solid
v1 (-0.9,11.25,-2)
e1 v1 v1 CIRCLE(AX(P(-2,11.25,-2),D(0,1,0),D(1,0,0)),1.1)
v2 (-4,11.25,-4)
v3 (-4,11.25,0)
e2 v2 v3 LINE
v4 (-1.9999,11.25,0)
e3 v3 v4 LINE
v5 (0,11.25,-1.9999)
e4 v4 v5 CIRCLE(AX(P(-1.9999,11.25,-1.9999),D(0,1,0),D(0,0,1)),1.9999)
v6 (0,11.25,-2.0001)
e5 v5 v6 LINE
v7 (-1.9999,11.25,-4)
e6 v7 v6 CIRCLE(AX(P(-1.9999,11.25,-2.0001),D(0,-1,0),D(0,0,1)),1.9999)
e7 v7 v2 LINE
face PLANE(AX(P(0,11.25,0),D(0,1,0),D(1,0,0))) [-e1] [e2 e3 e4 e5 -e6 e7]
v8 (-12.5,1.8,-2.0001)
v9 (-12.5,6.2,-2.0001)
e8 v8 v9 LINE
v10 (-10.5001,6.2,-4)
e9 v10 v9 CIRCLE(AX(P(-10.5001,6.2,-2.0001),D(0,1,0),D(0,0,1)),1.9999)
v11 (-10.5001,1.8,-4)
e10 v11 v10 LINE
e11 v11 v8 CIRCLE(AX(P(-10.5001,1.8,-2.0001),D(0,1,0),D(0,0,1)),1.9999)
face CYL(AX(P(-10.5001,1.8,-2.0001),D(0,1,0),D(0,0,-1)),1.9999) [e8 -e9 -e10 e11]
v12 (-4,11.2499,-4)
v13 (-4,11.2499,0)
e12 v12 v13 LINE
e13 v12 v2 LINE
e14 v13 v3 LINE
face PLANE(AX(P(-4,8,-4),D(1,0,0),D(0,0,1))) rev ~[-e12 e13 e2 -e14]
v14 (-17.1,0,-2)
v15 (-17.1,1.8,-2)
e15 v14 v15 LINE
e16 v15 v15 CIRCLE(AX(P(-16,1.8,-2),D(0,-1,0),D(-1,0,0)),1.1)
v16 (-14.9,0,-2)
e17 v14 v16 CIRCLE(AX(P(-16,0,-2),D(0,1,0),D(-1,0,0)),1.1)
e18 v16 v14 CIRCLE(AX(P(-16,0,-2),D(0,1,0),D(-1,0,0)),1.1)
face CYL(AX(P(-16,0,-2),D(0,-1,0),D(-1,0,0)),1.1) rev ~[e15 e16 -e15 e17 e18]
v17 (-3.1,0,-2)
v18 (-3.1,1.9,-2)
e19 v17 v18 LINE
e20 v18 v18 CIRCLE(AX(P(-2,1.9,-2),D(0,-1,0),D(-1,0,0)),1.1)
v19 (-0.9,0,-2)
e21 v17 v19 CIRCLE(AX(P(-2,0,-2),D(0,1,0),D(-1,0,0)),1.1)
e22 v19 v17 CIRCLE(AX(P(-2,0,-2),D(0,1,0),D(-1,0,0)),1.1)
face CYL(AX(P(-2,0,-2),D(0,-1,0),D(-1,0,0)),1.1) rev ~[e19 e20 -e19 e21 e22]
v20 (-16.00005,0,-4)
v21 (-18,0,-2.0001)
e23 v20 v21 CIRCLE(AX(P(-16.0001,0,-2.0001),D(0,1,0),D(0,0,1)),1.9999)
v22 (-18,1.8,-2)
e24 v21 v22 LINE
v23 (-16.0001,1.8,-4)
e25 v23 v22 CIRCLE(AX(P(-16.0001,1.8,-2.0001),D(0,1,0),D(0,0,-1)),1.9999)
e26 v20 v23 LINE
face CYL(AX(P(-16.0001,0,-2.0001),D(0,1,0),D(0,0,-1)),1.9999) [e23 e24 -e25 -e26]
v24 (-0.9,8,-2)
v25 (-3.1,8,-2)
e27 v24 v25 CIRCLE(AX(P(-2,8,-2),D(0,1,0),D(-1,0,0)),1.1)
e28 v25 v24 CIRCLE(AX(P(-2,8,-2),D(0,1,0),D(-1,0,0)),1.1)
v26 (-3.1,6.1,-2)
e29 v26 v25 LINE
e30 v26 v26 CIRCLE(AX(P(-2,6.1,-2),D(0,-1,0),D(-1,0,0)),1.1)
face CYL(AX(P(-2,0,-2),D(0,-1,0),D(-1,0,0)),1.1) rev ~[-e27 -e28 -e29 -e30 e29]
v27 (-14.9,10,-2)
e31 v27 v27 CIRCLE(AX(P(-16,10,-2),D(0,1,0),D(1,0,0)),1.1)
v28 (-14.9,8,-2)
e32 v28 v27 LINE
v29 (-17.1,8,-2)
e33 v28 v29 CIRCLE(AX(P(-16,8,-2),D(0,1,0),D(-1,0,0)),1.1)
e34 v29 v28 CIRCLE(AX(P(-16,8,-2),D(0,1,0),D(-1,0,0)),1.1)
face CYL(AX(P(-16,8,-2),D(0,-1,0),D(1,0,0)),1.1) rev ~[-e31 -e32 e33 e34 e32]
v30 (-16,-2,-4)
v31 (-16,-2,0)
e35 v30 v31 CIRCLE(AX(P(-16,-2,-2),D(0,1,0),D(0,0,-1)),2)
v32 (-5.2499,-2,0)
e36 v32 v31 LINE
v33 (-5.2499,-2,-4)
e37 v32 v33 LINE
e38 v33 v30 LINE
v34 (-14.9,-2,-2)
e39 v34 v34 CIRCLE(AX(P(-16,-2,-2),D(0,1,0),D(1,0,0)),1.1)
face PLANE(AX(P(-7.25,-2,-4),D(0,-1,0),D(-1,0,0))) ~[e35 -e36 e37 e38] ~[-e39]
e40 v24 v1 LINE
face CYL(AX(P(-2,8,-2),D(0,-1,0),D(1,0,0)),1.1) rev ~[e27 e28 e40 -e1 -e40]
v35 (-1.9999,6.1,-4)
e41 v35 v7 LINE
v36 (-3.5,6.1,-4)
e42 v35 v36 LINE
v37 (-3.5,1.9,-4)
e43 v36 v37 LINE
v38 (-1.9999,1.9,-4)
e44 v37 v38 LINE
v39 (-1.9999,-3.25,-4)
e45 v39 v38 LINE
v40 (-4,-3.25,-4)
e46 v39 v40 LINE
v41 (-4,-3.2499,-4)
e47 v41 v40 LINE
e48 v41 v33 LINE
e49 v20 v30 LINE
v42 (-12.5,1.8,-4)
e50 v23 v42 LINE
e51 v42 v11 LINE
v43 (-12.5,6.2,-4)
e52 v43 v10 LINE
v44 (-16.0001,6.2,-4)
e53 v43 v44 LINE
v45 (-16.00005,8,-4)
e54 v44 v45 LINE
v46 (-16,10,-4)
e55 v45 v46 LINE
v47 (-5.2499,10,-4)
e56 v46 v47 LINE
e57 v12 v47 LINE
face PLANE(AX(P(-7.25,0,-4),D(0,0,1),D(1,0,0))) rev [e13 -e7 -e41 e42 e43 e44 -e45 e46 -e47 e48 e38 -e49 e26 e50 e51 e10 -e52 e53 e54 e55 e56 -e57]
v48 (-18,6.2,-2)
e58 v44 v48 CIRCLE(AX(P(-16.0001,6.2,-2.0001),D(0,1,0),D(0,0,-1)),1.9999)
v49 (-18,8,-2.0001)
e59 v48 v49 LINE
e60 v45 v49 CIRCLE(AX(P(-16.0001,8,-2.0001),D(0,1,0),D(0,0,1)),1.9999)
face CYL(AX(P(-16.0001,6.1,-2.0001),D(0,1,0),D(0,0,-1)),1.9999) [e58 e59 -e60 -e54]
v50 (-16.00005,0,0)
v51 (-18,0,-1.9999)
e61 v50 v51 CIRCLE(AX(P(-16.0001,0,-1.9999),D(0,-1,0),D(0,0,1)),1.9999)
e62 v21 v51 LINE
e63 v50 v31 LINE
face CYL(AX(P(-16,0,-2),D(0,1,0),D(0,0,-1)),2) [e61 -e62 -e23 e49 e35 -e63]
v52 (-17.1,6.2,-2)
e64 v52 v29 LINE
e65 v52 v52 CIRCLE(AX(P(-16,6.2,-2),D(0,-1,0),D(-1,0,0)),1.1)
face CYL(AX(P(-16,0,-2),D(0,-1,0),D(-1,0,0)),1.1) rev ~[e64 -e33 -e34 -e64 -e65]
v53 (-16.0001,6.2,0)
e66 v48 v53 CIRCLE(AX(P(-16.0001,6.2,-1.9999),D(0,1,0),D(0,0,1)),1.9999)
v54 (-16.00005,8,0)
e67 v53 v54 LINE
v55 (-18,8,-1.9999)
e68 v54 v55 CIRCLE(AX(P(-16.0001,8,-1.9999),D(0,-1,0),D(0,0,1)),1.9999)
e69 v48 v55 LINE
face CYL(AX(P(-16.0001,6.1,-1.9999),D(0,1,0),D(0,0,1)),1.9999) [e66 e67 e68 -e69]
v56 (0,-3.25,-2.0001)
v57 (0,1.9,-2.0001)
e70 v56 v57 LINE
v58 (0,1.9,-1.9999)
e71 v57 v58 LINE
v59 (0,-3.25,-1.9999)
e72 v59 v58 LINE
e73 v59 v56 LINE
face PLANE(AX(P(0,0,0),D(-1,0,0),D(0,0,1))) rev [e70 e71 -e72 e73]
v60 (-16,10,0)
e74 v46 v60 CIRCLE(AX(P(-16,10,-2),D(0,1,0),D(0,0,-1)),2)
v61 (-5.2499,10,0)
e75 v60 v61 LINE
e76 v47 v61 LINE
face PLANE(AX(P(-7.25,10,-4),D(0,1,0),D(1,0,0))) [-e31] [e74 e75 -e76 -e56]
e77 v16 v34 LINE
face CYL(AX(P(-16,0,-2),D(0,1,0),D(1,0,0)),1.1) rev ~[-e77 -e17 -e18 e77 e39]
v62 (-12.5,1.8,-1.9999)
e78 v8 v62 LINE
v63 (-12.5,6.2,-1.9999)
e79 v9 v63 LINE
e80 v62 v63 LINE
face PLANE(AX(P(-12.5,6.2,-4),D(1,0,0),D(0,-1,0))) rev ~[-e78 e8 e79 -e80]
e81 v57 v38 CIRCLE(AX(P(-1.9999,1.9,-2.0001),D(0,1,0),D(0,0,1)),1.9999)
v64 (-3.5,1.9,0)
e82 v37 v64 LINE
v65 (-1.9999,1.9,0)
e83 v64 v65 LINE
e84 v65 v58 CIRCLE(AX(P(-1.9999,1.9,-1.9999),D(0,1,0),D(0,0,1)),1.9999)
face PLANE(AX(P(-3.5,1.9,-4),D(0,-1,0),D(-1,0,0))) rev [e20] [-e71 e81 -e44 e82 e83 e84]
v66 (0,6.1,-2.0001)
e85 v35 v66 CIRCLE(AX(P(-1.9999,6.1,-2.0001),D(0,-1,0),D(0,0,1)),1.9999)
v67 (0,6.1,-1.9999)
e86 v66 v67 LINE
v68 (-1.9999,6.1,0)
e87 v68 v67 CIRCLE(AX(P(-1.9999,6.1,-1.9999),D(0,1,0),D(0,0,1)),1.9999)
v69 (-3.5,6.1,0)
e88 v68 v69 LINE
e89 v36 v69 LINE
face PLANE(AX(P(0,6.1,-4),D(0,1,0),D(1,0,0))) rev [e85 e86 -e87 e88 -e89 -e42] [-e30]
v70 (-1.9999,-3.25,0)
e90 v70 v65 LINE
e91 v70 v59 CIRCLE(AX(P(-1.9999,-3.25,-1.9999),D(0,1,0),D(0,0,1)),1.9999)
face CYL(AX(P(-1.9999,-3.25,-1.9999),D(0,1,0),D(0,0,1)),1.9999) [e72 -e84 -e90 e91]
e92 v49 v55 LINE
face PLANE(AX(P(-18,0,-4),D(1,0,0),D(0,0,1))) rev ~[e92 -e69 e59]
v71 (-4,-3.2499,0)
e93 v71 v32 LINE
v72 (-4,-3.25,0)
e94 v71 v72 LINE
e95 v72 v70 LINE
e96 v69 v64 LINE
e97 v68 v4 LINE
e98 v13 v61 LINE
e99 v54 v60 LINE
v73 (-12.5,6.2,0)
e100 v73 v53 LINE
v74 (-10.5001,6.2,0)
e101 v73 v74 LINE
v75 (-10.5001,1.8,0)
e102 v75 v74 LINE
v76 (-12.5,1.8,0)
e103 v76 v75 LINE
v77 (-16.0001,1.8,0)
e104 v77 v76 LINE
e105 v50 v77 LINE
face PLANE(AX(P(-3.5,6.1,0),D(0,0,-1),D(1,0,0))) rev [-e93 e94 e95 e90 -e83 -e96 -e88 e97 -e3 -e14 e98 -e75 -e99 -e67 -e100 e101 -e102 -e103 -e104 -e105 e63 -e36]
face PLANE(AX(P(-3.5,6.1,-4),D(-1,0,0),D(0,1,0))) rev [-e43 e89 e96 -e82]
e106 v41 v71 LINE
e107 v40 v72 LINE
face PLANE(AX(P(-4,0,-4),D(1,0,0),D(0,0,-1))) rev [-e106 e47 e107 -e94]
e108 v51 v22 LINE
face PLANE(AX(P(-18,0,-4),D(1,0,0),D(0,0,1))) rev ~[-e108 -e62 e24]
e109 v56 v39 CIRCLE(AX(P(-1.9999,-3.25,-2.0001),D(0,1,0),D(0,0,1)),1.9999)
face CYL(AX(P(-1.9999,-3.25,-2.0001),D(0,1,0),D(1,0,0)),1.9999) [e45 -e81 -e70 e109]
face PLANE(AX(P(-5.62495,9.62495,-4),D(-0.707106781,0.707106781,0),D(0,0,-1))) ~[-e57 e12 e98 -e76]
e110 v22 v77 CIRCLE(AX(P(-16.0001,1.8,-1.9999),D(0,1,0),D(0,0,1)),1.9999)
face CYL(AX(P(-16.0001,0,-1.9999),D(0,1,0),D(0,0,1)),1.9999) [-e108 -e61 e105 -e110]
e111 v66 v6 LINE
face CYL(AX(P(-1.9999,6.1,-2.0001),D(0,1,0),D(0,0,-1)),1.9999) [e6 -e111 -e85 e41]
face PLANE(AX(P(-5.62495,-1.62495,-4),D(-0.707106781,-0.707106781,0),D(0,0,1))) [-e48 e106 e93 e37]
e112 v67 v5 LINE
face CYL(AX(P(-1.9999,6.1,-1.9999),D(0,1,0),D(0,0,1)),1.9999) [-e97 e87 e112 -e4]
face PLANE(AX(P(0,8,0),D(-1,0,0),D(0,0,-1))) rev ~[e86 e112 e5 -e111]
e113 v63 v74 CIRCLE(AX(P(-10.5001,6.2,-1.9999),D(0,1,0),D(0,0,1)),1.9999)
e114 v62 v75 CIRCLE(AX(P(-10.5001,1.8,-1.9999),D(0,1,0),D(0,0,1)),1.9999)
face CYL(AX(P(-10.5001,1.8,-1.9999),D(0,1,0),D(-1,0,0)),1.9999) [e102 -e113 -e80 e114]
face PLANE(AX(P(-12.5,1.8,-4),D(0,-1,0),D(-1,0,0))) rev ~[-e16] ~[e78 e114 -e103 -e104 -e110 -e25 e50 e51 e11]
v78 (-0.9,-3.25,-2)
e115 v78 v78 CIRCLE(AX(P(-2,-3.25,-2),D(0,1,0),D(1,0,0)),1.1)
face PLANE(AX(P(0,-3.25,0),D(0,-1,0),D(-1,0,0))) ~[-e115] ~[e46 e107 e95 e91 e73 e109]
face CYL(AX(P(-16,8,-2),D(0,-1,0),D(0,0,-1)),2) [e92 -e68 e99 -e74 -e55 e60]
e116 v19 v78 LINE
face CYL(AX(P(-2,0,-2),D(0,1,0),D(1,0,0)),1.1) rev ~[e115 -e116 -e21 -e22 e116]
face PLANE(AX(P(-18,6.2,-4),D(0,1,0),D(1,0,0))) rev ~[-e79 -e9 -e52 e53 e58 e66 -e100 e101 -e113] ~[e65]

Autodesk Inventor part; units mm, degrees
sketch "Sketch1" plane through (0, 0, 0) normal (0, 1, 0) x (-1, 0, 0)
  line L0 (0, 0) -> (18, 0)
  line L1 (18, 0) -> (18, -4)
  line L2 (18, -4) -> (0, -4)
  line L3 (0, -4) -> (0, 0)
  line L4 (18, -2) -> (16, -2)
  line L5 (9, -4) -> (9, -3)
  circle A0 centre (16, -2) radius 1.1
  circle A1 centre (2, -2) radius 1.1
  dimension "d0" = 18
  dimension "d1" = 4
  dimension "d2" = 2
  dimension "d3" = 2.2
sketch "Sketch1 outline for Extrusion1" plane through (0, 0, 0) normal (0, 1, 0) x (-1, 0, 0)
  line L0 (18, -4) -> (18, 0)
  line L1 (0, -4) -> (18, -4)
  line L2 (0, 0) -> (0, -4)
  line L3 (18, 0) -> (0, 0)
extrude "Extrusion1" add sketch "Sketch1 outline for Extrusion1" along normal blind 8
sketch "Sketch2" plane through (0, 0, -4) normal (0, 0, -1) x (-1, 0, 0)
  line L0 (18, 0) -> (18, 8) projected
  line L1 (18, 8) -> (18, 6.1)
  line L2 (18, 0) -> (0, 0) projected
  line L3 (18, 0) -> (18, 1.9)
  line L4 (18, 6.1) -> (14.5, 6.1)
  line L5 (14.5, 6.1) -> (14.5, 1.9)
  line L6 (14.5, 1.9) -> (18, 1.9)
  line L7 (18, 1.9) -> (18, 6.1)
  dimension "d6" = 1.9
  dimension "d7" = 1.9
  dimension "d8" = 3.5
sketch "Sketch2 outline for Extrusion2" plane through (0, 0, -4) normal (0, 0, -1) x (-1, 0, 0)
  line L0 (14.5, 6.1) -> (14.5, 1.9)
  line L1 (18, 6.1) -> (14.5, 6.1)
  line L2 (18, 1.9) -> (18, 6.1)
  line L3 (14.5, 1.9) -> (18, 1.9)
extrude "Extrusion2" cut sketch "Sketch2 outline for Extrusion2" against normal blind 8
ref_plane "Work Plane1" through (-9, 0, 0) normal (1, 0, 0) x (0, 0, -1)
mirror "Mirror1" about plane through (-9, 0, 0) normal (1, 0, 0) of "Extrusion2"
sketch "Sketch1 outline for Extrusion3" plane through (0, 0, 0) normal (0, 1, 0) x (-1, 0, 0)
  circle A0 centre (2, -2) radius 1.1
  circle A1 centre (16, -2) radius 1.1
extrude "Extrusion3" cut sketch "Sketch1 outline for Extrusion3" along normal blind 8
sketch "Sketch4" plane through (0, 8, 0) normal (0, 1, 0) x (1, 0, 0)
  line L0 (-18, 0) -> (0, 0) projected
  line L1 (0, 0) -> (-4, 0)
  line L2 (-4, 0) -> (-4, 4)
  line L3 (-4, 4) -> (0, 4)
  line L4 (0, 4) -> (0, 0)
  circle A0 centre (-2, 2) radius 1.1 projected
  circle A1 centre (-2, 2) radius 1.1
  dimension "d14" = 4
  dimension "d15" = 4
  dimension "d16" = 2.2
sketch "Sketch4 outline for Extrusion4" plane through (0, 8, 0) normal (0, 1, 0) x (1, 0, 0)
  line L0 (0, 0) -> (0, 4)
  line L1 (-4, 0) -> (0, 0)
  line L2 (0, 4) -> (-4, 4)
  line L3 (-4, 4) -> (-4, 0)
  circle A0 centre (-2, 2) radius 1.1
extrude "Extrusion4" add sketch "Sketch4 outline for Extrusion4" along normal blind 3.25
ref_plane "Work Plane2" through (-3.5, 4, 0) normal (0, 1, 0) x (1, 0, 0)
mirror "Mirror2" about plane through (-3.5, 4, 0) normal (0, 1, 0) of "Extrusion4"
fillet "Fillet2" radius 2 8 edges at (0, 8.675, -4) (0, -0.675, -4) (0, -0.675, 0) (0, 8.675, 0) (-18, 7.05, -4) (-18, 0.95, -4) (-18, 7.05, 0) (-18, 0.95, 0)
chamfer "Chamfer1" distance 3.25 angle 45 2 edges at (-4, 8, -2) (-4, 0, -2)
sketch "Sketch5" plane through (-14.5, 1.9, 0) normal (0, 0, 1) x (1, 0, 0)
  line L0 (0, 4.2) -> (0, 0) projected
  line L1 (0, 4.2) -> (2, 4.2)
  line L2 (2, 4.2) -> (2, 0)
  line L3 (2, 0) -> (0, 0)
  line L4 (0, 0) -> (0, 4.2)
  point P0 (14.5, -1.9)
  point P1 (0, 0)
  dimension "d23" = 2
sketch "Sketch5 outline for Extrusion5" plane through (-14.5, 1.9, 0) normal (0, 0, 1) x (1, 0, 0)
  line L0 (0, 0) -> (2, 0)
  line L1 (0, 4.2) -> (0, 0)
  line L2 (2, 4.2) -> (0, 4.2)
  line L3 (2, 0) -> (2, 4.2)
extrude "Extrusion5" cut sketch "Sketch5 outline for Extrusion5" against normal blind 20
sketch "Sketch6" plane through (0, 8, 0) normal (0, 1, 0) x (1, 0, 0)
  line L0 (-7.25, 4) -> (-4, 4) projected
  line L1 (-16, 0) -> (-12.5, 0) projected
  line L2 (-7.25, 4) -> (-16, 4)
  line L3 (-16, 4) -> (-16, 0)
  line L4 (-16, 0) -> (-7.25, 0)
  line L5 (-7.25, 0) -> (-7.25, 4)
  circle A0 centre (-16, 2) radius 2
  circle A1 centre (-16, 2) radius 1.1
  point P0 (0, 0)
sketch "Sketch6 outline for Extrusion6" plane through (0, 8, 0) normal (0, 1, 0) x (1, 0, 0)
  arc A0 (-16, 4) -> (-16, 0) centre (-16, 2) ccw
  line L0 (-7.25, 4) -> (-16, 4)
  line L1 (-16, 0) -> (-12.5, 0)
  line L2 (-7.25, 0) -> (-7.25, 4)
  line L3 (-12.5, 0) -> (-7.25, 0)
  circle A1 centre (-16, 2) radius 1.1
extrude "Extrusion6" add sketch "Sketch6 outline for Extrusion6" along normal blind 2
sketch "Sketch7" plane through (-3.5, 1.9, -4) normal (0, 0, -1) x (-1, 0, 0)
  line L0 (3.75, 6.1) -> (3.75, 8.1)
  line L1 (3.75, 8.1) -> (1.311143, 8.1)
  line L2 (1.311143, 8.1) -> (1.311143, 4.926567)
  line L3 (1.311143, 4.926567) -> (3.75, 4.926567)
  line L4 (3.75, 4.926567) -> (3.75, 8.1)
  point P0 (-3.5, -1.9)
sketch "Sketch7 outline for Extrusion7" plane through (-3.5, 1.9, -4) normal (0, 0, -1) x (-1, 0, 0)
  line L0 (1.311143, 4.926567) -> (3.75, 4.926567)
  line L1 (1.311143, 8.1) -> (1.311143, 4.926567)
  line L2 (3.75, 8.1) -> (1.311143, 8.1)
  line L3 (3.75, 6.1) -> (3.75, 8.1)
  line L4 (3.75, 4.926567) -> (3.75, 6.1)
extrude "Extrusion7" add sketch "Sketch7 outline for Extrusion7" against normal blind 4
ref_plane "Work Plane3" through (0, 4, 0) normal (0, 1, 0) x (1, 0, 0)
mirror "Mirror3" about plane through (0, 4, 0) normal (0, 1, 0) of "Extrusion6", "Extrusion7"
sketch "Sketch8" plane through (-3.5, 1.9, -4) normal (0, 0, -1) x (-1, 0, 0)
  line L0 (12.5, 0) -> (14.5, 0)
  line L1 (14.5, 0) -> (14.5, -0.1)
  line L2 (14.5, -3.9) -> (14.5, 0)
  line L3 (14.5, -0.1) -> (8.337258, -0.1)
  line L4 (14.5, 4.2) -> (12.5, 4.2)
  line L5 (14.5, 4.2) -> (14.5, 4.3)
  line L6 (14.5, 4.2) -> (14.5, 8.1)
  line L7 (14.5, 4.3) -> (6.488775, 4.3)
  line L8 (14.5, -0.1) -> (9.5, -0.1)
  line L9 (9.5, -0.1) -> (9.5, 4.3)
  line L10 (9.5, 4.3) -> (14.5, 4.3)
  line L11 (14.5, 4.3) -> (14.5, -0.1)
  point P0 (-3.5, -1.9)
  point P1 (9.5, -0.1)
  dimension "d30" = 0.1
  dimension "d31" = 0.1
sketch "Sketch8 outline for Extrusion8" plane through (-3.5, 1.9, -4) normal (0, 0, -1) x (-1, 0, 0)
  line L0 (14.5, 0) -> (14.5, 4.2)
  line L1 (14.5, -0.1) -> (14.5, 0)
  line L2 (9.5, -0.1) -> (14.5, -0.1)
  line L3 (9.5, 4.3) -> (9.5, -0.1)
  line L4 (14.5, 4.3) -> (9.5, 4.3)
  line L5 (14.5, 4.2) -> (14.5, 4.3)
extrude "Extrusion8" cut sketch "Sketch8 outline for Extrusion8" against normal blind 4
sketch "Sketch9" plane through (-3.5, 1.9, -4) normal (0, 0, -1) x (-1, 0, 0)
  line L0 (12.5, -0.1) -> (9.5, -0.1) projected
  line L1 (9, 0) -> (9, 4.2) projected
  line L2 (9.5, -0.1) -> (9, -0.1)
  line L3 (9, -0.1) -> (9, 0)
  line L4 (9, 0) -> (9.5, 0)
  line L5 (9.5, 0) -> (9.5, -0.1)
  line L6 (9, 4.2) -> (9.5, 4.2) projected
  line L7 (9.5, 4.2) -> (9.5, 4.3) projected
  line L8 (9, 4.2) -> (9.5, 4.2)
  line L9 (9.5, 4.2) -> (9.5, 4.3)
  line L10 (9.5, 4.3) -> (9, 4.3)
  line L11 (9, 4.3) -> (9, 4.2)
  point P0 (-3.5, -1.9)
sketch "Sketch9 outline for Extrusion9" plane through (-3.5, 1.9, -4) normal (0, 0, -1) x (-1, 0, 0)
  line L0 (9, 4.3) -> (9, 4.2)
  line L1 (9.5, 4.3) -> (9, 4.3)
  line L2 (9.5, 4.2) -> (9.5, 4.3)
  line L3 (9, 4.2) -> (9.5, 4.2)
  line L4 (9, 0) -> (9, -0.1)
  line L5 (9.5, 0) -> (9, 0)
  line L6 (9.5, -0.1) -> (9.5, 0)
  line L7 (9, -0.1) -> (9.5, -0.1)
extrude "Extrusion9" cut sketch "Sketch9 outline for Extrusion9" against normal blind 20
fillet "Fillet3" radius 2 2 edges at (-12.5, 4, -4) (-12.5, 4, 0)
properties part number "short_link_v2"
